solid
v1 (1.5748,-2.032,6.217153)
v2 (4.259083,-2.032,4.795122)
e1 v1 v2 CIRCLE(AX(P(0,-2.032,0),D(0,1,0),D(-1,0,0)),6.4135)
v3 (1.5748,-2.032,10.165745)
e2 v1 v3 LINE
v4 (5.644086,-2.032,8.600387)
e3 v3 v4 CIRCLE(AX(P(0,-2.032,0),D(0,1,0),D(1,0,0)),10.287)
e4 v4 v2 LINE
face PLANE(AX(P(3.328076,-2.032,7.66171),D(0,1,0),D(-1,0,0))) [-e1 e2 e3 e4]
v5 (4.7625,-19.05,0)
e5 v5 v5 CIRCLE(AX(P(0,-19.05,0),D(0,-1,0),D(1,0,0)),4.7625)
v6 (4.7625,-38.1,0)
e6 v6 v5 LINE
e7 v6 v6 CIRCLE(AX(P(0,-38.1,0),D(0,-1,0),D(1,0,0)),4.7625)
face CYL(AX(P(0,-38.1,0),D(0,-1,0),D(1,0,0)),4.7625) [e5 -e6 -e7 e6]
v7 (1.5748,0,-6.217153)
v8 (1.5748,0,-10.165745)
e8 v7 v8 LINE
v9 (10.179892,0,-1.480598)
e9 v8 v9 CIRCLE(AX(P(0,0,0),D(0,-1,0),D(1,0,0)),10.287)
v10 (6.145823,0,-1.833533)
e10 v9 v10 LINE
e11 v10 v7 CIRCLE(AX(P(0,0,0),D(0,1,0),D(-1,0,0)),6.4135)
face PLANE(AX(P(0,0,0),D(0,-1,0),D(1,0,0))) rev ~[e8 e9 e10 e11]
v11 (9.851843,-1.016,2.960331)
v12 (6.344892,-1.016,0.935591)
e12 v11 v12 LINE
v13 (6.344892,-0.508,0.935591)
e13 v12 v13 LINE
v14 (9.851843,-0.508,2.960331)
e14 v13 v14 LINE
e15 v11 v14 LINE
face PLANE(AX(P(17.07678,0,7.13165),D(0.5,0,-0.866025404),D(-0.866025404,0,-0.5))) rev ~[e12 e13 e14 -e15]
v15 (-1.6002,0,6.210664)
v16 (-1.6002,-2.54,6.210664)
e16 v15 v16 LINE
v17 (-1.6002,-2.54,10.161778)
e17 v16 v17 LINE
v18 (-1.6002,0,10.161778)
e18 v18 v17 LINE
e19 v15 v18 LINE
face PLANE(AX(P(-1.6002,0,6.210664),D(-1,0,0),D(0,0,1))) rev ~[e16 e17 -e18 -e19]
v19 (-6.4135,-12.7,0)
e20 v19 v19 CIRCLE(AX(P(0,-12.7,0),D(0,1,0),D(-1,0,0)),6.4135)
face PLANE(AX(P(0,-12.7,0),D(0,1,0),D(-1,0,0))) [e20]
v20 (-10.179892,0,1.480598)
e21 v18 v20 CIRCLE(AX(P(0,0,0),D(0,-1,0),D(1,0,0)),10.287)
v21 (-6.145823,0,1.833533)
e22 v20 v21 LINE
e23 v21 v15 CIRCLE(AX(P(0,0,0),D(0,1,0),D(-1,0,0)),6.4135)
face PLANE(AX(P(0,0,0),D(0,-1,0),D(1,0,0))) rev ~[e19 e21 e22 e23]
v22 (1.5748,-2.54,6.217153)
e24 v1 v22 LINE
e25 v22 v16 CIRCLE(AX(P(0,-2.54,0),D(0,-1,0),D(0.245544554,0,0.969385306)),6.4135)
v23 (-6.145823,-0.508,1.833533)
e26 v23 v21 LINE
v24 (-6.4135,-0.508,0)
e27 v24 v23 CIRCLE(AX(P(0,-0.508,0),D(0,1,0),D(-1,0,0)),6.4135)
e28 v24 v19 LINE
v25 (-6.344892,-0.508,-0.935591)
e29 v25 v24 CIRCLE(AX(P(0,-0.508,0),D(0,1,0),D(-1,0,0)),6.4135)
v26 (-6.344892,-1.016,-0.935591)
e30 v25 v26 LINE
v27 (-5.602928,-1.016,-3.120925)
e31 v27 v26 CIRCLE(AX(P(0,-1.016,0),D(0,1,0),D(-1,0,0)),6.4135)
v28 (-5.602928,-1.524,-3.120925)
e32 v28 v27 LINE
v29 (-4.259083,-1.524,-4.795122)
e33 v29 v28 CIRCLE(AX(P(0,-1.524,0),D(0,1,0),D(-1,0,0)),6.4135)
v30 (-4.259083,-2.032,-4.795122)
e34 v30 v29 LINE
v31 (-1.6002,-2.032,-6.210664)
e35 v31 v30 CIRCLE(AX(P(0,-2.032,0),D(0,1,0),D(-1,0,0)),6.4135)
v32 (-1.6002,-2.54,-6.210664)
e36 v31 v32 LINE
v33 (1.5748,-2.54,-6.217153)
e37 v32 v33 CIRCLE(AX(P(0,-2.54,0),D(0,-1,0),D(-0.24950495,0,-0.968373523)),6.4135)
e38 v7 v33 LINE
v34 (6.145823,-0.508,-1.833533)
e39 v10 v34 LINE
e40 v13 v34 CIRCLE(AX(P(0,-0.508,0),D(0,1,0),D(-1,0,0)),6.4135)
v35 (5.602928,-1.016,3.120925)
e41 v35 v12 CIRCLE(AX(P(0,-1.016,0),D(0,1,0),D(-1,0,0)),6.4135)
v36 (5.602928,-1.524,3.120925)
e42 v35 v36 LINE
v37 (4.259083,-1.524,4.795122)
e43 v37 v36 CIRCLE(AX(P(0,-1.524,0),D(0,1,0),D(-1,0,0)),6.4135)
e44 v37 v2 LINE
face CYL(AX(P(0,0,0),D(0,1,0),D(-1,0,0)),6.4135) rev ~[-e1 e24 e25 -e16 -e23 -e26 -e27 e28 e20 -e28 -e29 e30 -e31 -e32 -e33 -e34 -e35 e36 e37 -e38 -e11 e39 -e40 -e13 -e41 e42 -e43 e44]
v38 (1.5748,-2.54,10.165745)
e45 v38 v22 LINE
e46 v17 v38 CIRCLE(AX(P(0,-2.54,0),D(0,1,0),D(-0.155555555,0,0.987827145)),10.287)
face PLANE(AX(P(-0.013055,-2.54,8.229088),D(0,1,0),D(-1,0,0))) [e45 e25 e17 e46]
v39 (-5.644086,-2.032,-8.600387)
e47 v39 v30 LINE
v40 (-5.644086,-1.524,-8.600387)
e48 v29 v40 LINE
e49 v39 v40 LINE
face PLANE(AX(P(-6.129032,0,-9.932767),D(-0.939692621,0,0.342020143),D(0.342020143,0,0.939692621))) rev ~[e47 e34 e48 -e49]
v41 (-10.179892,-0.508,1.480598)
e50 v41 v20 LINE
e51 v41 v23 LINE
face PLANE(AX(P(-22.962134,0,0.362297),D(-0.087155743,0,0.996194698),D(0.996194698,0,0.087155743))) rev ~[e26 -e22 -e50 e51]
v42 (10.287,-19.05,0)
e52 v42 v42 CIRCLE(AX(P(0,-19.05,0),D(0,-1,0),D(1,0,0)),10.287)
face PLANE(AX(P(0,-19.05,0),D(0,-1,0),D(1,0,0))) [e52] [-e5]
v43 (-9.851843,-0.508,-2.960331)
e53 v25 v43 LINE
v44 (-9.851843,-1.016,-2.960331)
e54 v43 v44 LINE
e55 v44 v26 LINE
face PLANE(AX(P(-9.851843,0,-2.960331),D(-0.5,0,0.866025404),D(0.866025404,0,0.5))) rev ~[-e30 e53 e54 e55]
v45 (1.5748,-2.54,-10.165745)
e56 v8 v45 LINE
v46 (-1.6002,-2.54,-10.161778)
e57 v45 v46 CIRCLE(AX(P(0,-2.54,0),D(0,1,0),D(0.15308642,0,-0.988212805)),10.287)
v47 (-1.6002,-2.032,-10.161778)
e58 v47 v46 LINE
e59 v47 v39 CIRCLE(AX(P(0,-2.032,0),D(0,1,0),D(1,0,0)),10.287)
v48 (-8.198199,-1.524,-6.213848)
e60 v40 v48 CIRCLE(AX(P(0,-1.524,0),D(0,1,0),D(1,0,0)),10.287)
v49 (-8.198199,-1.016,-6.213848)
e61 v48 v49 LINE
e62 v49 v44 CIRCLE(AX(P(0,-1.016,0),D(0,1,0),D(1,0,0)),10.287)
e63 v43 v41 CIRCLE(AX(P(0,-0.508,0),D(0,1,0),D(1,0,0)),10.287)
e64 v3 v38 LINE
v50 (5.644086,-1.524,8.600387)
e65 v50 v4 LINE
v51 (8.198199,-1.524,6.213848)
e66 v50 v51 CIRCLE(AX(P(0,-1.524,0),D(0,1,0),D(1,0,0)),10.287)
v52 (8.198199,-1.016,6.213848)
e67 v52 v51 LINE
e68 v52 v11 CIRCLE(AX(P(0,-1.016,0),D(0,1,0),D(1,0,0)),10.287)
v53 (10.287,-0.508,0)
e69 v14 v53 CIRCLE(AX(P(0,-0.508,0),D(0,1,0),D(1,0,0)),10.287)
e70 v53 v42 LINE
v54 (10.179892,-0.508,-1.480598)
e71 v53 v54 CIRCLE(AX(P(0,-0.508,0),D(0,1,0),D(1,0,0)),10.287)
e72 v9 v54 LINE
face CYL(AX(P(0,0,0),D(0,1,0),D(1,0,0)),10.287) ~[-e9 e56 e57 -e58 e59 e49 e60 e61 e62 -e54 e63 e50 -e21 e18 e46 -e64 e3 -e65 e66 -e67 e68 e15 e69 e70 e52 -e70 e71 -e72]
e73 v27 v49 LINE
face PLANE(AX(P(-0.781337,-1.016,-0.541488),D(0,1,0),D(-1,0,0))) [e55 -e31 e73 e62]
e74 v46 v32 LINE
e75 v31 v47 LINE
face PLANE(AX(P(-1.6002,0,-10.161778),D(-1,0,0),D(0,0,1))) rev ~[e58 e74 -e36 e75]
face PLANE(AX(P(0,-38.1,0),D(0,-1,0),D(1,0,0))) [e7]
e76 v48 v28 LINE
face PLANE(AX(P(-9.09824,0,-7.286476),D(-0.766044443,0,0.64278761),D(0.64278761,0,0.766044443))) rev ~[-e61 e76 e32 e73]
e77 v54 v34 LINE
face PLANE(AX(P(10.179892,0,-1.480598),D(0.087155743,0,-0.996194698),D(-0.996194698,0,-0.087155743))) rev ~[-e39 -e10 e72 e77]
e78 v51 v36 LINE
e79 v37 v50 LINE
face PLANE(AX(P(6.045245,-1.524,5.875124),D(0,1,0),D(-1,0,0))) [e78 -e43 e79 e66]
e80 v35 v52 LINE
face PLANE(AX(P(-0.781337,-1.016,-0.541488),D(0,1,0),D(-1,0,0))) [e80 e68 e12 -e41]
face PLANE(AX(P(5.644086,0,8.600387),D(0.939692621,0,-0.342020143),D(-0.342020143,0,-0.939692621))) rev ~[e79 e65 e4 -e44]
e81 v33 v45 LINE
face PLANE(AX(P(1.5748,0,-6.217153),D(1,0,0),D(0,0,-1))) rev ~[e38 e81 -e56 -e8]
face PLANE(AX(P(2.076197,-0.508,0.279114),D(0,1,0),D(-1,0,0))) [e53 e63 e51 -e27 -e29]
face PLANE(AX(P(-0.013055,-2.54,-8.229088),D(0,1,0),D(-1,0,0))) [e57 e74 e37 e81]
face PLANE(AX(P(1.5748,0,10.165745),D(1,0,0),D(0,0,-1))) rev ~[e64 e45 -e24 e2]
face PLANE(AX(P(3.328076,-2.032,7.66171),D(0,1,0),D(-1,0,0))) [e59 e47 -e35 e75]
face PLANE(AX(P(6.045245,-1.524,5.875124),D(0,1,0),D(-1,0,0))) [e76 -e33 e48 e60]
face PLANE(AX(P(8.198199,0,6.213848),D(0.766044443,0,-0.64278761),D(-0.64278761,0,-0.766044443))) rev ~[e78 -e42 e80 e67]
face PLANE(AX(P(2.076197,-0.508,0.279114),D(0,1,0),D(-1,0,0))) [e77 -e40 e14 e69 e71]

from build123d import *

# Parameters (mm, degrees)
F0_R      = 10.287
F1_DEPTH  = 38.1
F2_R      = 10.287
F2_R_2    = 4.7625
F3_DEPTH  = 19.05
F4_R      = 6.4135
F5_DEPTH  = 12.7
F7_DEPTH  = 2.54
F9_DEPTH  = 2.032
F11_DEPTH = 1.524
F13_DEPTH = 1.016
F15_DEPTH = 0.508


# Not quite as in the source:
# - a feature names something its author has since deleted; it is built from what else it names


with BuildPart() as f1:
    # F0 (on Front) → F1 (new body)
    with BuildSketch(Plane.XZ):
        Circle(F0_R)
    extrude(amount=F1_DEPTH)

    # F2 (on face) → F3 (cut)
    with BuildSketch(Plane.XZ.offset(38.1)):
        Circle(F2_R)
        Circle(F2_R_2, mode=Mode.SUBTRACT)
    extrude(amount=-F3_DEPTH, mode=Mode.SUBTRACT)

    # F4 (on face) → F5 (cut)
    with BuildSketch(Plane(origin=(0, 0, 0), x_dir=(-1, 0, 0), z_dir=(0, 1, 0))):
        Circle(F4_R)
    extrude(amount=-F5_DEPTH, mode=Mode.SUBTRACT)

    # F6 (on face) → F7 (cut)
    with BuildSketch(Plane(origin=(0, 0, 0), x_dir=(-1, 0, 0), z_dir=(0, 1, 0))):
        with BuildLine():
            ThreePointArc((1.6002, 10.1617778445), (0.0128539811, 10.2869919692), (-1.5748, 10.1657451257))
            Line((-1.5748, 10.1657451257), (-1.5748, 6.217152661))
            ThreePointArc((-1.5748, 6.217152661), (0.013107899, 6.413486605), (1.6002, 6.2106635885))
            Line((1.6002, 6.2106635885), (1.6002, 10.1617778445))
        make_face()
        with BuildLine():
            Line((-1.5748, -6.217152661), (-1.5748, -10.1657451257))
            ThreePointArc((-1.5748, -10.1657451257), (0.0128539811, -10.2869919692), (1.6002, -10.1617778445))
            Line((1.6002, -10.1617778445), (1.6002, -6.2106635885))
            ThreePointArc((1.6002, -6.2106635885), (0.013107899, -6.413486605), (-1.5748, -6.217152661))
        make_face()
    extrude(amount=-F7_DEPTH, mode=Mode.SUBTRACT)

    # F8 (on face) → F9 (cut)
    with BuildSketch(Plane(origin=(0, 0, 0), x_dir=(-1, 0, 0), z_dir=(0, 1, 0))):
        with BuildLine():
            ThreePointArc((-1.5748, 10.1657451257), (-3.6933269708, 9.6011303963), (-5.6440857783, 8.6003874754))
            Line((-5.6440857783, 8.6003874754), (-4.2590825341, 4.795122336))
            ThreePointArc((-4.2590825341, 4.795122336), (-3.0023472345, 5.6673532917), (-1.5748, 6.217152661))
            Line((-1.5748, 6.217152661), (-1.5748, 10.1657451257))
        make_face()
        with BuildLine():
            Line((-1.6895483294, 11.5486066381), (-6.129032147, 9.932766673))
            Line((-6.129032147, 9.932766673), (-5.6440857783, 8.6003874754))
            ThreePointArc((-5.6440857783, 8.6003874754), (-3.6933269708, 9.6011303963), (-1.5748, 10.1657451257))
            Line((-1.5748, 10.1657451257), (-1.5748, 6.217152661))
            ThreePointArc((-1.5748, 6.217152661), (-3.0023472345, 5.6673532917), (-4.2590825341, 4.795122336))
            Line((-4.2590825341, 4.795122336), (1.6895483294, -11.5486066381))
            Line((1.6895483294, -11.5486066381), (6.129032147, -9.932766673))
            Line((6.129032147, -9.932766673), (-1.6895483294, 11.5486066381))
        make_face()
    extrude(amount=-F9_DEPTH, mode=Mode.SUBTRACT)

    # F10 (on face) → F11 (cut)
    with BuildSketch(Plane(origin=(0, 0, 0), x_dir=(-1, 0, 0), z_dir=(0, 1, 0))):
        with BuildLine():
            ThreePointArc((-5.6440857783, 8.6003874754), (-7.0232543947, 7.5163998502), (-8.1981986695, 6.213848049))
            Line((-8.1981986695, 6.213848049), (-5.6029284192, 3.1209254044))
            ThreePointArc((-5.6029284192, 3.1209254044), (-5.0015546435, 4.0146523384), (-4.2590825341, 4.795122336))
            Line((-4.2590825341, 4.795122336), (-5.6440857783, 8.6003874754))
        make_face()
        with BuildLine():
            Line((-5.5958847817, 10.2253004606), (-9.0982399757, 7.2864755091))
            Line((-9.0982399757, 7.2864755091), (-8.1981986695, 6.213848049))
            ThreePointArc((-8.1981986695, 6.213848049), (-7.0232543947, 7.5163998502), (-5.6440857783, 8.6003874754))
            Line((-5.6440857783, 8.6003874754), (-4.2590825341, 4.795122336))
            ThreePointArc((-4.2590825341, 4.795122336), (-5.0015546435, 4.0146523384), (-5.6029284192, 3.1209254044))
            Line((-5.6029284192, 3.1209254044), (5.5958847817, -10.2253004606))
            Line((5.5958847817, -10.2253004606), (9.0982399757, -7.2864755091))
            Line((9.0982399757, -7.2864755091), (-5.5958847817, 10.2253004606))
        make_face()
    extrude(amount=-F11_DEPTH, mode=Mode.SUBTRACT)

    # F12 (on face) → F13 (cut)
    with BuildSketch(Plane(origin=(0, 0, 0), x_dir=(-1, 0, 0), z_dir=(0, 1, 0))):
        with BuildLine():
            Line((-14.7145799005, 11.2231002783), (-17.0767799005, 7.1316498607))
            Line((-17.0767799005, 7.1316498607), (15.3816246724, -11.6082187569))
            Line((15.3816246724, -11.6082187569), (17.7438246724, -7.5167683393))
            Line((17.7438246724, -7.5167683393), (9.8518430547, -2.9603306279))
            ThreePointArc((9.8518430547, -2.9603306279), (9.1704604826, -4.6610109994), (8.1981986695, -6.213848049))
            Line((8.1981986695, -6.213848049), (5.6029284192, -3.1209254044))
            ThreePointArc((5.6029284192, -3.1209254044), (6.0730159591, -2.0619067413), (6.3448917326, -0.935591338))
            Line((6.3448917326, -0.935591338), (-14.7145799005, 11.2231002783))
        make_face()
        with BuildLine():
            Line((9.8518430547, -2.9603306279), (6.3448917326, -0.935591338))
            ThreePointArc((6.3448917326, -0.935591338), (6.0730159591, -2.0619067413), (5.6029284192, -3.1209254044))
            Line((5.6029284192, -3.1209254044), (8.1981986695, -6.213848049))
            ThreePointArc((8.1981986695, -6.213848049), (9.1704604826, -4.6610109994), (9.8518430547, -2.9603306279))
        make_face()
    extrude(amount=-F13_DEPTH, mode=Mode.SUBTRACT)

    # F14 (on face) → F15 (cut)
    with BuildSketch(Plane(origin=(0, 0, 0), x_dir=(-1, 0, 0), z_dir=(0, 1, 0))):
        with BuildLine():
            Line((-25.8091024604, 4.6292271013), (-26.2208610514, -0.0771951304))
            Line((-26.2208610514, -0.0771951304), (-10.1798918612, -1.4805980865))
            ThreePointArc((-10.1798918612, -1.4805980865), (-10.260188024, -0.7422335965), (-10.287, 0))
            ThreePointArc((-10.287, 0), (-10.1776293532, 1.4960714382), (-9.8518430547, 2.9603306279))
            Line((-9.8518430547, 2.9603306279), (-6.3448917326, 0.935591338))
            ThreePointArc((-6.3448917326, 0.935591338), (-6.3969914921, -0.4598718295), (-6.1458227701, -1.8335333998))
            Line((-6.1458227701, -1.8335333998), (22.5503757634, -4.3441254578))
            Line((22.5503757634, -4.3441254578), (22.9621343545, 0.3622967739))
            Line((22.9621343545, 0.3622967739), (-25.8091024604, 4.6292271013))
        make_face()
        with BuildLine():
            ThreePointArc((-10.287, 0), (-10.260188024, -0.7422335965), (-10.1798918612, -1.4805980865))
            Line((-10.1798918612, -1.4805980865), (-6.1458227701, -1.8335333998))
            ThreePointArc((-6.1458227701, -1.8335333998), (-6.3969914921, -0.4598718295), (-6.3448917326, 0.935591338))
            Line((-6.3448917326, 0.935591338), (-9.8518430547, 2.9603306279))
            ThreePointArc((-9.8518430547, 2.9603306279), (-10.1776293532, 1.4960714382), (-10.287, 0))
        make_face()
    extrude(amount=-F15_DEPTH, mode=Mode.SUBTRACT)


solid = f1.part
